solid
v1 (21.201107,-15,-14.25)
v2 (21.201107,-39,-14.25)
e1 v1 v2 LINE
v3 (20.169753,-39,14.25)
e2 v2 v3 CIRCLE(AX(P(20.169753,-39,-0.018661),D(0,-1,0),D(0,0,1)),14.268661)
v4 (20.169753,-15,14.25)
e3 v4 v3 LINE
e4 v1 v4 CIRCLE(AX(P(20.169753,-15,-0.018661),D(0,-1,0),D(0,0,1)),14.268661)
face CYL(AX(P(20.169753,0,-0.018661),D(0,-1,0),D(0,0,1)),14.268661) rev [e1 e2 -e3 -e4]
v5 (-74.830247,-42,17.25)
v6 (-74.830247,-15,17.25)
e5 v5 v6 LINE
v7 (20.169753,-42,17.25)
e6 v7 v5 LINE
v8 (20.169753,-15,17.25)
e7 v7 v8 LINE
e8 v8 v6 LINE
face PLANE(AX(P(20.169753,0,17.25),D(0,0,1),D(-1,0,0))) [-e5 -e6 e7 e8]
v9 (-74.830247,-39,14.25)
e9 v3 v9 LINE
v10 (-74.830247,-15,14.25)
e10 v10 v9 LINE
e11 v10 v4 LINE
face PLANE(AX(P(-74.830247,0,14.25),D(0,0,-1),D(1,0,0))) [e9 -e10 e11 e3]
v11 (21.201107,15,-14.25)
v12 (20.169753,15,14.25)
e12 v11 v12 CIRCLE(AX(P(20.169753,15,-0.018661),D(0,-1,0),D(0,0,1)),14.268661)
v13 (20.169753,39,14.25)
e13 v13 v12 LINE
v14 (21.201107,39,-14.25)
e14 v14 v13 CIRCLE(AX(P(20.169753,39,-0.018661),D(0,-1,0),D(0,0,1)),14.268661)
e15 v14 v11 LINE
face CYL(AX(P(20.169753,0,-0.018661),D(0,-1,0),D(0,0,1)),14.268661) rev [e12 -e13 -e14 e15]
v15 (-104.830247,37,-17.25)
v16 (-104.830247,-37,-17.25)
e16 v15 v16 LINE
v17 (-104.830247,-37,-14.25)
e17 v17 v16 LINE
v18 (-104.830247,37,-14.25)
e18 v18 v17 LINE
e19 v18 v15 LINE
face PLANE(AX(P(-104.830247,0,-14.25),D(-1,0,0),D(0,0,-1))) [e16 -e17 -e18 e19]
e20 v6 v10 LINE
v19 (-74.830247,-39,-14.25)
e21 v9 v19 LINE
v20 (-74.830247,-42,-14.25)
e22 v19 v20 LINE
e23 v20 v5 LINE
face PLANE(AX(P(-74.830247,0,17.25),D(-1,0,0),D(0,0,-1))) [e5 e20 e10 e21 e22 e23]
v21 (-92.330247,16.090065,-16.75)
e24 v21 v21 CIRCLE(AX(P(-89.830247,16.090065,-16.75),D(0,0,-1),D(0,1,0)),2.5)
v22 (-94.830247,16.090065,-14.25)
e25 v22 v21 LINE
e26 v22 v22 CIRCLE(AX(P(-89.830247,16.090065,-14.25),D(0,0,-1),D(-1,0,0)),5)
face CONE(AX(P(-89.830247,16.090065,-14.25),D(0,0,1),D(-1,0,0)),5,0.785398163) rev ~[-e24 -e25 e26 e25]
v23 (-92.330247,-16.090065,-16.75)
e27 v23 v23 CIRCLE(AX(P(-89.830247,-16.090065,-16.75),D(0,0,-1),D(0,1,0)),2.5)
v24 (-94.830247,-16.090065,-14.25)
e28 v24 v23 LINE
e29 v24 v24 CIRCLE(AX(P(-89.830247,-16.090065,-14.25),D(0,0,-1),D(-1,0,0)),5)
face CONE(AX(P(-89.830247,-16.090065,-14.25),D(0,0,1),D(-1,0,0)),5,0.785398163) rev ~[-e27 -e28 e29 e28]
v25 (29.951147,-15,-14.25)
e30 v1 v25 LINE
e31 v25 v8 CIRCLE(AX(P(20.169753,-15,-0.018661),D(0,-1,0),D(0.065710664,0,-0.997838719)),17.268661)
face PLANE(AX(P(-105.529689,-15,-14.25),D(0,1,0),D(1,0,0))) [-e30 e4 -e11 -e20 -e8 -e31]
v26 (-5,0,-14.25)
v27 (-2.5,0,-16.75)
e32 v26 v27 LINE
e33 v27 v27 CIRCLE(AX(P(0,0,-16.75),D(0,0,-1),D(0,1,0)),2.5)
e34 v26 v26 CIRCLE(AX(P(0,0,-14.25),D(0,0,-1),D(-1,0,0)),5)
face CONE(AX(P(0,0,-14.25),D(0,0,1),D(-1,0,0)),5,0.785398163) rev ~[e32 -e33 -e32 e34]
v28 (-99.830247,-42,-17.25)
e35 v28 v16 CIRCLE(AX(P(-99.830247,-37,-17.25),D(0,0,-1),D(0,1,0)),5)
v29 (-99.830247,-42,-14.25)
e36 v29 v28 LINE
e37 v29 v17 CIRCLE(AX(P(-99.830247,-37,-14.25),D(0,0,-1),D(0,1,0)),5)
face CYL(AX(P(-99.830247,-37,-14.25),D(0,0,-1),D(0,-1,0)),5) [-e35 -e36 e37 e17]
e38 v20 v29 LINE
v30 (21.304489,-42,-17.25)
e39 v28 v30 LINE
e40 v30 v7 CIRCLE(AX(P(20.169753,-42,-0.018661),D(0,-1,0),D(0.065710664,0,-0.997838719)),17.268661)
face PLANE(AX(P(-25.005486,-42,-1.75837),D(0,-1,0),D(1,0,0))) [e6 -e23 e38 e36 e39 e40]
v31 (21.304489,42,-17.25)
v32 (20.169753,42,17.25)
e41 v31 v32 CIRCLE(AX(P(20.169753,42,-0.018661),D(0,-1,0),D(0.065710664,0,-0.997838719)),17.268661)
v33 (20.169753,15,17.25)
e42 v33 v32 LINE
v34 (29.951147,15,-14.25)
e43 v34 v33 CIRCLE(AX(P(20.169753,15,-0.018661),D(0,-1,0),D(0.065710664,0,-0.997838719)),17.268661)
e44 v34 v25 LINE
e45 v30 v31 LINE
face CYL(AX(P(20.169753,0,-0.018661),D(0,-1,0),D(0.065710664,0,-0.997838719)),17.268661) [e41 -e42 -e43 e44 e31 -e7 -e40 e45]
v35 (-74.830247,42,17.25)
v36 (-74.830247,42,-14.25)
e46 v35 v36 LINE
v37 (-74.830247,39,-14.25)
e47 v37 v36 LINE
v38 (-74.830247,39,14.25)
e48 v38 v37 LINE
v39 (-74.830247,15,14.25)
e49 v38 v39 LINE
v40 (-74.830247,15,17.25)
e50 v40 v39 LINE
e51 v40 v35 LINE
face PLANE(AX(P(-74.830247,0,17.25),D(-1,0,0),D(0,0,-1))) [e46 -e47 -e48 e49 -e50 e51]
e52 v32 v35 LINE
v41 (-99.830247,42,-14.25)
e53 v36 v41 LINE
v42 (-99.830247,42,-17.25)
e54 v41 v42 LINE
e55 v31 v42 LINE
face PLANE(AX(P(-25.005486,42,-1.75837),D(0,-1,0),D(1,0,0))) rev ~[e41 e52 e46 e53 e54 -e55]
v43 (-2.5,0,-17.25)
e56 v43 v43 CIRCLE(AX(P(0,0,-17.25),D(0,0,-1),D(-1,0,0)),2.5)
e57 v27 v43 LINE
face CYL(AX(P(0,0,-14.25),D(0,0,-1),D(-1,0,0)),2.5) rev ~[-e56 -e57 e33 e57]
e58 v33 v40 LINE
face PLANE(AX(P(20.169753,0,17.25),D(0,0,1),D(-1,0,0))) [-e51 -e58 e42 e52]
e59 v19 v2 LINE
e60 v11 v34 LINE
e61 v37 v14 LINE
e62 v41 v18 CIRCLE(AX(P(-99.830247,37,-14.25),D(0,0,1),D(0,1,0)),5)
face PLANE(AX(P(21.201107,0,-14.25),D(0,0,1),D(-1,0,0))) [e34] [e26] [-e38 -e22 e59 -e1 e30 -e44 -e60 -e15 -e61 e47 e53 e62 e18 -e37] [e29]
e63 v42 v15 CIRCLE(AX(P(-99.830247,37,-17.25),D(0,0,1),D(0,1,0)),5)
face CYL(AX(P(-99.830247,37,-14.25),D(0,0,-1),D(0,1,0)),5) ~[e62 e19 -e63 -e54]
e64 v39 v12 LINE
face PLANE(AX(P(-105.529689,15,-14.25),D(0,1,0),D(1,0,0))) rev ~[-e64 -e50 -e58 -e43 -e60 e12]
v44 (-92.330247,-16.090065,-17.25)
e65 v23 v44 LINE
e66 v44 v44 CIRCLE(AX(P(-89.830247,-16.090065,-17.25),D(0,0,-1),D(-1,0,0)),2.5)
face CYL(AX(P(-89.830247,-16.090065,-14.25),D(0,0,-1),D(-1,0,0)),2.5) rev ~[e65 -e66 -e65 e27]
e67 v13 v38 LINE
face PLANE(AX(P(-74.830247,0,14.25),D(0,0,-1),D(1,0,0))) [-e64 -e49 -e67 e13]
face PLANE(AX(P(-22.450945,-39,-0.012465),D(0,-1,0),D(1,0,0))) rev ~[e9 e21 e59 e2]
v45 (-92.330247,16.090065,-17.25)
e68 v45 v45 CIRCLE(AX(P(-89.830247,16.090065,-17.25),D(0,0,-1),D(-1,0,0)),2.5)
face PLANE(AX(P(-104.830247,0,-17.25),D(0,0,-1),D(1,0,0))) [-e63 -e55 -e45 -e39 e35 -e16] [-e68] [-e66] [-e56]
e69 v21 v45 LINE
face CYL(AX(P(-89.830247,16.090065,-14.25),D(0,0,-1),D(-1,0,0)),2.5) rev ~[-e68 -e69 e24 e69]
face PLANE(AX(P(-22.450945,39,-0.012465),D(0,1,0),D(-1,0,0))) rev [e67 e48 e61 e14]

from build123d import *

# Parameters (mm, degrees)
F1_DEPTH       = 42
F1_DEPTH_BACK  = 42
F3_DEPTH       = 3
F4_W           = 171.0703811337
F4_H           = 30
F5_DEPTH       = 31.501
F6_R           = 5
F8_D           = 5
F8_CSINK_D     = 10
F8_CSINK_ANGLE = 90


# Not quite as in the source:
# - a pattern or mirror of a feature is missing from the dataset's text; its kind, count and spacing are read off the source's solid


with BuildPart() as f1:
    # F0 (on Front) → F1 (new body, two sides)
    with BuildSketch(Plane.XZ) as f1_sk:
        with BuildLine():
            Line((-74.8302465006, 17.25), (-74.8302465006, 14.25))
            Line((-74.8302465006, 14.25), (20.1697534994, 14.25))
            ThreePointArc((20.1697534994, 14.25), (34.429081055, 0.4973529093), (21.2011066634, -14.25))
            Line((21.2011066634, -14.25), (-104.8302465006, -14.25))
            Line((-104.8302465006, -14.25), (-104.8302465006, -17.25))
            Line((-104.8302465006, -17.25), (21.3044886882, -17.25))
            ThreePointArc((21.3044886882, -17.25), (37.4290815856, 0.5490131867), (20.1697534994, 17.25))
            Line((20.1697534994, 17.25), (-74.8302465006, 17.25))
        make_face()
    extrude(amount=F1_DEPTH)
    extrude(f1_sk.sketch, amount=-F1_DEPTH_BACK)

    # F2 (on face) → F3 (join)
    with BuildSketch(Plane.XZ.offset(42)):
        with BuildLine():
            Line((20.1697534994, 17.25), (-74.8302465006, 17.25))
            Line((-74.8302465006, 17.25), (-74.8302465006, -17.25))
            Line((-74.8302465006, -17.25), (21.3044886882, -17.25))
            ThreePointArc((21.3044886882, -17.25), (37.4290815856, 0.5490131867), (20.1697534994, 17.25))
        make_face()
    f3 = extrude(amount=-F3_DEPTH)

    # F3_copies: F3 across plane
    add(f3.mirror(Plane.ZX))

    # F4 (on face) → F5 (cut, through all)
    with BuildSketch(Plane.XY.offset(-14.25)):
        with Locations((-19.9944982305, 0)):
            Rectangle(F4_W, F4_H)
    extrude(amount=F5_DEPTH, mode=Mode.SUBTRACT)

    # F6
    f6_edges = [f1.edges().sort_by_distance(p)[0] for p in [
        (-104.830247, -42, -15.75),
        (-104.830247, 42, -15.75),
    ]]
    fillet(f6_edges, radius=F6_R)

    # F8 (through all)
    with Locations(Plane.XY.offset(-14.25)):
        with Locations((-89.8302465006, -16.0900652409), (-89.8302465006, 16.0900652409), (0, 0)):
            CounterSinkHole(F8_D / 2, F8_CSINK_D / 2, counter_sink_angle=F8_CSINK_ANGLE)


solid = f1.part
